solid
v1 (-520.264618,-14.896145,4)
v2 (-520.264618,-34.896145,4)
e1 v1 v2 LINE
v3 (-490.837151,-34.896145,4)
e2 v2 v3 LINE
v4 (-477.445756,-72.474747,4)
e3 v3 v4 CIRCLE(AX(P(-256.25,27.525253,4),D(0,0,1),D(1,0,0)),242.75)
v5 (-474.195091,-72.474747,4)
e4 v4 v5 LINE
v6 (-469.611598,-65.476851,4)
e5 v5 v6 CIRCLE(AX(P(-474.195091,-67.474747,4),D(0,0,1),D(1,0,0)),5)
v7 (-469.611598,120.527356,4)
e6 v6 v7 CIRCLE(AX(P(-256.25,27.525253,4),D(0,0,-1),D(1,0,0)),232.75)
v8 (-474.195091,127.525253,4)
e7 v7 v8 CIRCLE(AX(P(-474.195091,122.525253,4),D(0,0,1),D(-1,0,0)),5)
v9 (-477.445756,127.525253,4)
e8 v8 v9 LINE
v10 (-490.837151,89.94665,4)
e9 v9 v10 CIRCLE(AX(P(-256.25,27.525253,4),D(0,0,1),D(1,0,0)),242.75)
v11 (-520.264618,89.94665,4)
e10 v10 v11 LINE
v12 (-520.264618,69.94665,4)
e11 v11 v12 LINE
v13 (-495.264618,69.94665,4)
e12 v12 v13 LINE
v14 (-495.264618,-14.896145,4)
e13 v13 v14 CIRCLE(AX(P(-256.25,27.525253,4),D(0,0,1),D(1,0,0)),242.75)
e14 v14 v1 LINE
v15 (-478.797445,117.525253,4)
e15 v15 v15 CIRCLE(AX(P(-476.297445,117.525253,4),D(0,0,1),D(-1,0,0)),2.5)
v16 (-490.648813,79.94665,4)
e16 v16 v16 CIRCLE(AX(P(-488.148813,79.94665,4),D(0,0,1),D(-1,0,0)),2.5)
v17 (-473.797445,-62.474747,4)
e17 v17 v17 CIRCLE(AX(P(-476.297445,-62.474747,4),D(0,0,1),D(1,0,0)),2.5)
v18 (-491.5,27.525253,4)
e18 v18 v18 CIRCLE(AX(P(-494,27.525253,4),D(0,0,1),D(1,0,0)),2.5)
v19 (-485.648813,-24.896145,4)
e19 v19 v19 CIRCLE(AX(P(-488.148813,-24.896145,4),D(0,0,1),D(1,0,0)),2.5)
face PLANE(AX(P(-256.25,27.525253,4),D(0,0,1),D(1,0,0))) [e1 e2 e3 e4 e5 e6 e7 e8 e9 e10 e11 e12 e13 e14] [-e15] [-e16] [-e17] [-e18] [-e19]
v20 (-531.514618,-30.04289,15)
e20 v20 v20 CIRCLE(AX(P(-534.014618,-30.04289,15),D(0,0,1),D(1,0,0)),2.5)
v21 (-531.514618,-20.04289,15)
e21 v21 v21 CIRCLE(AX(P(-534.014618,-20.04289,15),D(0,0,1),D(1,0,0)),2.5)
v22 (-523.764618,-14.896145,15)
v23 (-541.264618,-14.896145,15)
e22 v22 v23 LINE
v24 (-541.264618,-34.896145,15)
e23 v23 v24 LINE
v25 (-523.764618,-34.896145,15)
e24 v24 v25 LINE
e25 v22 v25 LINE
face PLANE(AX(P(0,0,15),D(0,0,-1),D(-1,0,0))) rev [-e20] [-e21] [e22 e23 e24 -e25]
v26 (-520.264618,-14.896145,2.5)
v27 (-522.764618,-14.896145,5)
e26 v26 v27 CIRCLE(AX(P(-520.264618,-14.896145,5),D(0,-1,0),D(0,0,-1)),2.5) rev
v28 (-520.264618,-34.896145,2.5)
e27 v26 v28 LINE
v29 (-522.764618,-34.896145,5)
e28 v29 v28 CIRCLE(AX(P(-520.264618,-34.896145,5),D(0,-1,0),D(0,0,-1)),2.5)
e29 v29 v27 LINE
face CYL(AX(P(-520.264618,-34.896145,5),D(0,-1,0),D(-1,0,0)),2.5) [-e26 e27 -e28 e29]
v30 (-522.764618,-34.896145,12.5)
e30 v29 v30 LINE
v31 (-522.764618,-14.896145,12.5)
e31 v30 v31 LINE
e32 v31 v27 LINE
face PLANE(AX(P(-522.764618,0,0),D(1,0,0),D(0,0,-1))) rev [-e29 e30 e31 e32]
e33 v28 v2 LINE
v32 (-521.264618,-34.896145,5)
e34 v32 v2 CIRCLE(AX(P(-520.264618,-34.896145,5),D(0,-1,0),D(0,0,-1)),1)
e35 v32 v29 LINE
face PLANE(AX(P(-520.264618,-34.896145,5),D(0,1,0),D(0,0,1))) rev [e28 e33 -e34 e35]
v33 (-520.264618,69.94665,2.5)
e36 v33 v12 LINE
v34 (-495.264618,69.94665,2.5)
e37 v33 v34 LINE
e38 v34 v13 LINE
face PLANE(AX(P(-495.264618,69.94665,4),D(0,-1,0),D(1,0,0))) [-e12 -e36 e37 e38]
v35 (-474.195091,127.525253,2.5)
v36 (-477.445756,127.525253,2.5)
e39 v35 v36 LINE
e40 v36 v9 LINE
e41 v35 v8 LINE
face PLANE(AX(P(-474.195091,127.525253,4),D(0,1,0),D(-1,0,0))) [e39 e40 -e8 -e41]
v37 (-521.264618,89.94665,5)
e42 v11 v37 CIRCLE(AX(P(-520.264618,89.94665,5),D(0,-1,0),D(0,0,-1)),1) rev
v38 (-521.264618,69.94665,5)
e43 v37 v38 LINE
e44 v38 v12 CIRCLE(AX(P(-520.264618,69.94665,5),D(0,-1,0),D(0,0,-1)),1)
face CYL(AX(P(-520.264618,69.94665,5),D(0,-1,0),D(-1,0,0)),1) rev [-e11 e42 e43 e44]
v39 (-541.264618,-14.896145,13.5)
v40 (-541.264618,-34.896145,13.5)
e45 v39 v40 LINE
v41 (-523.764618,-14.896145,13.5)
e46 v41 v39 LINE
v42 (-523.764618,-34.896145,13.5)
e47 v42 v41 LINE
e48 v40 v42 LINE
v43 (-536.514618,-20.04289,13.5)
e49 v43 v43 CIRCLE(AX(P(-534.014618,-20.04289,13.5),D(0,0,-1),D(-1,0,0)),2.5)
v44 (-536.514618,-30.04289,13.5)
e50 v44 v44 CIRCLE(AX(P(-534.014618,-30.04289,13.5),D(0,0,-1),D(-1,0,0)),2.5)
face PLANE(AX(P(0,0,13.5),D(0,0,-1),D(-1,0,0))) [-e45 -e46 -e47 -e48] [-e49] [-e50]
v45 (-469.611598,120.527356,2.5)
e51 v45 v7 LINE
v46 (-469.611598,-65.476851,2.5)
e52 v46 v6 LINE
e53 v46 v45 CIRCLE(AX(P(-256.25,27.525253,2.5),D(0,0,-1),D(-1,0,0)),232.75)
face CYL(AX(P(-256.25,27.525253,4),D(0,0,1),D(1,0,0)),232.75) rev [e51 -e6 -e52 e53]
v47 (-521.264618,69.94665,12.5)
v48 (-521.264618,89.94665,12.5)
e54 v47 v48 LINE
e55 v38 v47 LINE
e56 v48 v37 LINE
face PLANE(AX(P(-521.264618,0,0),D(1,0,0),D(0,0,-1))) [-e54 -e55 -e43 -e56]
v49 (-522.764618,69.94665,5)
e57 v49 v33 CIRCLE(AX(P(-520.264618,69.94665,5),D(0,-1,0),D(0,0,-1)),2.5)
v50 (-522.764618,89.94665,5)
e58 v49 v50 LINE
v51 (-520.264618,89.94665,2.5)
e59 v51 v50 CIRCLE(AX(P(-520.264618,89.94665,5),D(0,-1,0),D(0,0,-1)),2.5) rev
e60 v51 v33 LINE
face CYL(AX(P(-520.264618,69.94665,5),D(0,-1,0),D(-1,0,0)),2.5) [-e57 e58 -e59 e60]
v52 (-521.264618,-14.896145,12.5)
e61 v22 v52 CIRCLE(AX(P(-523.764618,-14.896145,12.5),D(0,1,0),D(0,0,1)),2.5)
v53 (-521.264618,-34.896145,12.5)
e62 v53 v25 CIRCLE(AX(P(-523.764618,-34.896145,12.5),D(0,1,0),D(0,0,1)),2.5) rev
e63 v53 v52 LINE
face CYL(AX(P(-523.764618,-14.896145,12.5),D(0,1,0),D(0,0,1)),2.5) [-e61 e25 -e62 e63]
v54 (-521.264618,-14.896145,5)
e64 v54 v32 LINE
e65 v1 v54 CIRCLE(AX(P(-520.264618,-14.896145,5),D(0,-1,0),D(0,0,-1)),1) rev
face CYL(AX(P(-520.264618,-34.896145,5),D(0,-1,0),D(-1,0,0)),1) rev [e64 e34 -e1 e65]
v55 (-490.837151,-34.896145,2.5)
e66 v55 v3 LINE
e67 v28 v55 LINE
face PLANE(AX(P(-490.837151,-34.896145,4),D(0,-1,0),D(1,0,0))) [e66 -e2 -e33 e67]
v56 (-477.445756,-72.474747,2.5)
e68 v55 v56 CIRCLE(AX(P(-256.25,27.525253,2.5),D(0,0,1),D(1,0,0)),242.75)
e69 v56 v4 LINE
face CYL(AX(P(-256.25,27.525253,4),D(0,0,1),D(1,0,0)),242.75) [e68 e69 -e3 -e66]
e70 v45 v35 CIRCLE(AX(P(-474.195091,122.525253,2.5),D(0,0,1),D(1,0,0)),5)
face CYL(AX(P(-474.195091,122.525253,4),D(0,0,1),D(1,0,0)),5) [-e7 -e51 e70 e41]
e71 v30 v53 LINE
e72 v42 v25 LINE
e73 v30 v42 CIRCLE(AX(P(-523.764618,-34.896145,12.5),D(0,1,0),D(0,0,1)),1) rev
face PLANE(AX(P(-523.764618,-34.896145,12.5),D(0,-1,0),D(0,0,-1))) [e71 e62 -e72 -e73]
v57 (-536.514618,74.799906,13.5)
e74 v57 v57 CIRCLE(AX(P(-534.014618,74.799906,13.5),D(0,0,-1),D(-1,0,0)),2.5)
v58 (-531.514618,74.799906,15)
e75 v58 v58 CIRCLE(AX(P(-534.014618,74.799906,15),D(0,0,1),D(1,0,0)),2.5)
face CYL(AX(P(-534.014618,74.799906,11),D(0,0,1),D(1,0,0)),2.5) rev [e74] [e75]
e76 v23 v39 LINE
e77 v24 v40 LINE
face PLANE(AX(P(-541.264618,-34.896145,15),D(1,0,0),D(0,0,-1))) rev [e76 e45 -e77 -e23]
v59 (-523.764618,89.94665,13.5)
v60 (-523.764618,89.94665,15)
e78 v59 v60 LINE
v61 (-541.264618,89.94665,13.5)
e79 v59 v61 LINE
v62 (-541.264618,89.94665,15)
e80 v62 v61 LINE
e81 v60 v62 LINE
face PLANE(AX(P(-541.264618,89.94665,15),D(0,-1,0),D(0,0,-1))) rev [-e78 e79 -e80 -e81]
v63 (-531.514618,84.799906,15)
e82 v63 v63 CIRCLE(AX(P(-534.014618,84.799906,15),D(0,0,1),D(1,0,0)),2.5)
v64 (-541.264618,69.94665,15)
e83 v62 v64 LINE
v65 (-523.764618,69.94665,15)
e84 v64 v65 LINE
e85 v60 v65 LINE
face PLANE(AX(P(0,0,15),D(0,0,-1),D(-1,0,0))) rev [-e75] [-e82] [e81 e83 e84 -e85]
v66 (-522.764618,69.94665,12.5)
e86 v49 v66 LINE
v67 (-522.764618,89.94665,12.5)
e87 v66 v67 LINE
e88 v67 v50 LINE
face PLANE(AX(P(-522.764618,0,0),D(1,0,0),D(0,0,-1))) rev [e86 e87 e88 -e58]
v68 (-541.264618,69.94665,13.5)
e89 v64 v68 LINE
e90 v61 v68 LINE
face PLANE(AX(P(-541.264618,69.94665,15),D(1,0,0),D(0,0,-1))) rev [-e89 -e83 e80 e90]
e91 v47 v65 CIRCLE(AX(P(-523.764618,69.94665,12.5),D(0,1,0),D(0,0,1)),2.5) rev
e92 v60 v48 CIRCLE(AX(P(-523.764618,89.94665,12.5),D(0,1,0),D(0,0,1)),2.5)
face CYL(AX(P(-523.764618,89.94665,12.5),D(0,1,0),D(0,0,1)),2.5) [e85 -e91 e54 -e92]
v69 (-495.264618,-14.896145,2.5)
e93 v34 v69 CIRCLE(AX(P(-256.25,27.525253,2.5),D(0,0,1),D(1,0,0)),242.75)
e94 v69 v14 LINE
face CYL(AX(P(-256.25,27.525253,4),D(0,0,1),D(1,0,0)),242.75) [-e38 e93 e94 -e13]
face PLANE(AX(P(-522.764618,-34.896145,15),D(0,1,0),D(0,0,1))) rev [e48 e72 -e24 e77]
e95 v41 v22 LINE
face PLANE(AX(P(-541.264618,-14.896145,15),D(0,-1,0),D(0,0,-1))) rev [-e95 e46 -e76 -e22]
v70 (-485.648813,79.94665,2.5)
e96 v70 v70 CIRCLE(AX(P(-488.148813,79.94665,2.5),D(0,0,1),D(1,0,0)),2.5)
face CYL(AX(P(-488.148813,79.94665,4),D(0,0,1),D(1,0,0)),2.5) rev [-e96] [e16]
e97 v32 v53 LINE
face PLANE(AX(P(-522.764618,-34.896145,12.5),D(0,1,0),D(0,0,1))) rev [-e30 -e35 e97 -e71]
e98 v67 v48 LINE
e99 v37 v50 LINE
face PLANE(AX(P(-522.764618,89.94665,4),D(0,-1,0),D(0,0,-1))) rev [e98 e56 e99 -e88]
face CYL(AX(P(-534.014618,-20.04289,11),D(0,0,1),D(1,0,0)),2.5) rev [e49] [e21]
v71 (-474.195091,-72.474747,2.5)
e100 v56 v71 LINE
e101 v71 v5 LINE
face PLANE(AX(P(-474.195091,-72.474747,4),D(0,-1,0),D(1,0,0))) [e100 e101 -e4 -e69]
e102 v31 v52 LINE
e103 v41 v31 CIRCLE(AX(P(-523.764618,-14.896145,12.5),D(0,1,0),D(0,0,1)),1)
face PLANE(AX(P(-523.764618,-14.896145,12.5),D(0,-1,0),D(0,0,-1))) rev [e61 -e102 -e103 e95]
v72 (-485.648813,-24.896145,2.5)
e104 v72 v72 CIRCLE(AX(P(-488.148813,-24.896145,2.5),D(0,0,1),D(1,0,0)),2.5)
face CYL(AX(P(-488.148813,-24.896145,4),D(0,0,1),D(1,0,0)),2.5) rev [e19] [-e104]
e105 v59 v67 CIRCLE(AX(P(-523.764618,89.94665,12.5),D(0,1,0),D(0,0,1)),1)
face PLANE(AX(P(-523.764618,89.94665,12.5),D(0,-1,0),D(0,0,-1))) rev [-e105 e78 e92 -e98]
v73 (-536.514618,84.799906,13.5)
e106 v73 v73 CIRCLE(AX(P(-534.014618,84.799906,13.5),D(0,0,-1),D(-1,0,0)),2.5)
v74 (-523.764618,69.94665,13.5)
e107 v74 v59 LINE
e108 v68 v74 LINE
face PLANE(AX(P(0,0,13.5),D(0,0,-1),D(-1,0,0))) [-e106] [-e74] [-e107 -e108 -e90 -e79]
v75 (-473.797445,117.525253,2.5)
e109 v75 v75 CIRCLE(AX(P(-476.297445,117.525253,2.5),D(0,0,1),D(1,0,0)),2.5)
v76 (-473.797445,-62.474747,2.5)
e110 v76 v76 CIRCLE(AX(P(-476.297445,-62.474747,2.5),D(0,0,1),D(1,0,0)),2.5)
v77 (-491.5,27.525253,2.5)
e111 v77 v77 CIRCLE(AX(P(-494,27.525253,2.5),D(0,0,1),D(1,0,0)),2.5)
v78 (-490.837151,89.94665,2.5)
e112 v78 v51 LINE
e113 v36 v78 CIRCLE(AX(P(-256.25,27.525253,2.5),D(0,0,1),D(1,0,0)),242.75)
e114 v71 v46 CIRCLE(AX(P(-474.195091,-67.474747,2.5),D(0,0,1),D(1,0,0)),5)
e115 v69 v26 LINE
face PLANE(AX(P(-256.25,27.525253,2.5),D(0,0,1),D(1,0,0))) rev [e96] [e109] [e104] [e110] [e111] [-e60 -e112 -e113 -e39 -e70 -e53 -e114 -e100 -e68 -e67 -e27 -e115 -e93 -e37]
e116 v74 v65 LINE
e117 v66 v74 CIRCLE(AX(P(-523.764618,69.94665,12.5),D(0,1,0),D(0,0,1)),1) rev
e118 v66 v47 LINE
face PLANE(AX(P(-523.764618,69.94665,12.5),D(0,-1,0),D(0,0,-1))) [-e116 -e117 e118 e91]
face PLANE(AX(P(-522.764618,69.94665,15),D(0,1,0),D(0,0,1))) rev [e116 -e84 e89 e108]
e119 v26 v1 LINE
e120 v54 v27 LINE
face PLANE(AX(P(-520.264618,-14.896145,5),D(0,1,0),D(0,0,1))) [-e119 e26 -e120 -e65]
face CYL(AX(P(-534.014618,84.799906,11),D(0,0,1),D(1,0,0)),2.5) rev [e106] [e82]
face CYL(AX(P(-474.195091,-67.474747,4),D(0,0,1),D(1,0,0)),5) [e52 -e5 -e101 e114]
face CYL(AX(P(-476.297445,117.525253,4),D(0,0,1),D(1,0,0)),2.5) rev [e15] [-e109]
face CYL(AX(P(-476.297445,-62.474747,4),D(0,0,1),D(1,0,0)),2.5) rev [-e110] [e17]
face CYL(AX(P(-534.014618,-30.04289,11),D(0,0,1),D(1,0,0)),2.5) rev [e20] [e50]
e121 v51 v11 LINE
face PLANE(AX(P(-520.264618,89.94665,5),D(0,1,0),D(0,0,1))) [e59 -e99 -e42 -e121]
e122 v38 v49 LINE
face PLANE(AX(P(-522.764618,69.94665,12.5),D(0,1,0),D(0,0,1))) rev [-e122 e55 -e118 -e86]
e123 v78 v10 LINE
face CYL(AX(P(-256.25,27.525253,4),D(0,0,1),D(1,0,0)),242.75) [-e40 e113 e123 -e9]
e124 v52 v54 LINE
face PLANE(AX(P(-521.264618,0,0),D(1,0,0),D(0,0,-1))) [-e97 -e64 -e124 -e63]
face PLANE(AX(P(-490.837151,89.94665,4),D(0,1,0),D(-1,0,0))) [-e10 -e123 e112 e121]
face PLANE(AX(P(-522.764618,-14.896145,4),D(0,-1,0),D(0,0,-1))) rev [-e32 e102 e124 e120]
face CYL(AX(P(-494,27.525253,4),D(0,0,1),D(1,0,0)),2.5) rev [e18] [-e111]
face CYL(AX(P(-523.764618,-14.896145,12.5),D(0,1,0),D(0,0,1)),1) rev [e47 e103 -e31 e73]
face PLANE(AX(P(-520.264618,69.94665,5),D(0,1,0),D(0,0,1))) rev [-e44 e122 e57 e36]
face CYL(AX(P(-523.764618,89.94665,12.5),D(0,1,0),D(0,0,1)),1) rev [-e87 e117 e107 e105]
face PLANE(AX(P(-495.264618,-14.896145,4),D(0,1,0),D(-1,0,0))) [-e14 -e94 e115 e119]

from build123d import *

# Parameters (mm, degrees)
SKETCH1_R                = 2.5
BOSS_EXTRUDE1_DEPTH      = 4
CONVERT_SOLID1_OUTLINE_R = 2.5
CONVERT_SOLID1_DEPTH     = 2.5
EDGE_FLANGE1_DEPTH       = 20
EDGE_FLANGE1_BEND_DEPTH  = 20
EDGE_FLANGE2_DEPTH       = 20
EDGE_FLANGE2_BEND_DEPTH  = 20
SKETCH14_R               = 2.5
CUT_EXTRUDE1_DEPTH       = 4


# Read off the part's stored shape, not the designer's step: Convert-Solid1
# Sheet-metal steps are written as plain solids
with BuildPart() as part:
    # Sketch1 → Boss-Extrude1 (new body)
    with BuildSketch(Plane.XY):
        with BuildLine():
            Line((-474.195090562, 127.525252525), (-477.445756062, 127.525252525))
            ThreePointArc((-477.445756062, 127.525252525), (-484.91471638, 109.01150893), (-490.83715139, 89.946650322))
            Line((-490.83715139, 89.946650322), (-520.264617773, 89.946650322))
            Line((-520.264617773, 89.946650322), (-520.264617773, 69.946650322))
            Line((-520.264617773, 69.946650322), (-495.264617773, 69.946650322))
            ThreePointArc((-495.264617773, 69.946650322), (-499, 27.525252525), (-495.264617773, -14.896145272))
            Line((-495.264617773, -14.896145272), (-520.264617773, -14.896145272))
            Line((-520.264617773, -14.896145272), (-520.264617773, -34.896145272))
            Line((-520.264617773, -34.896145272), (-490.83715139, -34.896145272))
            ThreePointArc((-490.83715139, -34.896145272), (-484.91471638, -53.961003879), (-477.445756062, -72.474747475))
            Line((-477.445756062, -72.474747475), (-474.195090562, -72.474747475))
            ThreePointArc((-474.195090562, -72.474747475), (-470.012418883, -70.21432), (-469.611597595, -65.476850524))
            ThreePointArc((-469.611597595, -65.476850524), (-489, 27.525252525), (-469.611597595, 120.527355575))
            ThreePointArc((-469.611597595, 120.527355575), (-470.012418883, 125.264825051), (-474.195090562, 127.525252525))
        make_face()
        with Locations(Location((-488.148813177, 79.946650322, 0), (0, 0, 180))):
            Circle(SKETCH1_R, mode=Mode.SUBTRACT)
        with Locations((-494, 27.525252525)):
            Circle(SKETCH1_R, mode=Mode.SUBTRACT)
        with Locations((-488.148813177, -24.896145272)):
            Circle(SKETCH1_R, mode=Mode.SUBTRACT)
        with Locations((-476.297445473, -62.474747475)):
            Circle(SKETCH1_R, mode=Mode.SUBTRACT)
        with Locations(Location((-476.297445473, 117.525252525, 0), (0, 0, 180))):
            Circle(SKETCH1_R, mode=Mode.SUBTRACT)
    extrude(amount=BOSS_EXTRUDE1_DEPTH)

    # Convert-Solid1 outline → Convert-Solid1 (cut)
    with BuildSketch(Plane.XY):
        with BuildLine():
            ThreePointArc((-490.83715139, -34.896145272), (-484.91471638, -53.961003879), (-477.445756062, -72.474747475))
            Line((-477.445756062, -72.474747475), (-474.195090562, -72.474747475))
            ThreePointArc((-474.195090562, -72.474747475), (-470.012418883, -70.21432), (-469.611597595, -65.476850524))
            ThreePointArc((-469.611597595, -65.476850524), (-489, 27.525252525), (-469.611597595, 120.527355575))
            ThreePointArc((-469.611597595, 120.527355575), (-470.012418883, 125.264825051), (-474.195090562, 127.525252525))
            Line((-474.195090562, 127.525252525), (-477.445756062, 127.525252525))
            ThreePointArc((-477.445756062, 127.525252525), (-484.91471638, 109.011508929), (-490.83715139, 89.946650322))
            Line((-490.83715139, 89.946650322), (-520.264617773, 89.946650322))
            Line((-520.264617773, 89.946650322), (-520.264617773, 69.946650322))
            Line((-520.264617773, 69.946650322), (-495.264617773, 69.946650322))
            ThreePointArc((-495.264617773, 69.946650322), (-499, 27.525252525), (-495.264617773, -14.896145272))
            Line((-495.264617773, -14.896145272), (-520.264617773, -14.896145272))
            Line((-520.264617773, -14.896145272), (-520.264617773, -34.896145272))
            Line((-520.264617773, -34.896145272), (-490.83715139, -34.896145272))
        make_face()
        with Locations((-488.148813177, -24.896145272)):
            Circle(CONVERT_SOLID1_OUTLINE_R, mode=Mode.SUBTRACT)
        with Locations((-476.297445473, -62.474747475)):
            Circle(CONVERT_SOLID1_OUTLINE_R, mode=Mode.SUBTRACT)
        with Locations((-494, 27.525252525)):
            Circle(CONVERT_SOLID1_OUTLINE_R, mode=Mode.SUBTRACT)
        with Locations((-488.148813177, 79.946650322)):
            Circle(CONVERT_SOLID1_OUTLINE_R, mode=Mode.SUBTRACT)
        with Locations((-476.297445473, 117.525252525)):
            Circle(CONVERT_SOLID1_OUTLINE_R, mode=Mode.SUBTRACT)
    extrude(amount=CONVERT_SOLID1_DEPTH, mode=Mode.SUBTRACT)

    # Edge-Flange1 section (across the edge) → Edge-Flange1 (add)
    with BuildSketch(Plane(origin=(-521.264617773, 89.946650322, 4), x_dir=(1, 0, 0), z_dir=(0, -1, 0))):
        with BuildLine():
            Line((-1.5, 1), (-1.5, 8.5))
            Line((-1.5, 8.5), (0, 8.5))
            Line((0, 8.5), (0, 1))
            ThreePointArc((0, 1), (0.292893219, 0.292893219), (1, 0))
            Line((1, 0), (1, -1.5))
            ThreePointArc((1, -1.5), (-0.767766953, -0.767766953), (-1.5, 1))
        make_face()
    extrude(amount=EDGE_FLANGE1_DEPTH)

    # Edge-Flange1 section 2 (across the edge) → Edge-Flange1 bend (add)
    with BuildSketch(Plane(origin=(-521.264617773, -14.896145272, 4), x_dir=(1, 0, 0), z_dir=(0, -1, 0))):
        with BuildLine():
            Line((-1.5, 1), (-1.5, 8.5))
            Line((-1.5, 8.5), (0, 8.5))
            Line((0, 8.5), (0, 1))
            ThreePointArc((0, 1), (0.292893219, 0.292893219), (1, 0))
            Line((1, 0), (1, -1.5))
            ThreePointArc((1, -1.5), (-0.767766953, -0.767766953), (-1.5, 1))
        make_face()
    extrude(amount=EDGE_FLANGE1_BEND_DEPTH)

    # Edge-Flange2 section (across the edge) → Edge-Flange2 (add)
    with BuildSketch(Plane(origin=(-522.764617773, 69.946650322, 13.5), x_dir=(0, 0, -1), z_dir=(0, 1, 0))):
        with BuildLine():
            Line((-1.5, 1), (-1.5, 18.5))
            Line((-1.5, 18.5), (0, 18.5))
            Line((0, 18.5), (0, 1))
            ThreePointArc((0, 1), (0.292893219, 0.292893219), (1, 0))
            Line((1, 0), (1, -1.5))
            ThreePointArc((1, -1.5), (-0.767766953, -0.767766953), (-1.5, 1))
        make_face()
    extrude(amount=EDGE_FLANGE2_DEPTH)

    # Edge-Flange2 section 2 (across the edge) → Edge-Flange2 bend (add)
    with BuildSketch(Plane(origin=(-522.764617773, -34.896145272, 13.5), x_dir=(0, 0, -1), z_dir=(0, 1, 0))):
        with BuildLine():
            Line((-1.5, 1), (-1.5, 18.5))
            Line((-1.5, 18.5), (0, 18.5))
            Line((0, 18.5), (0, 1))
            ThreePointArc((0, 1), (0.292893219, 0.292893219), (1, 0))
            Line((1, 0), (1, -1.5))
            ThreePointArc((1, -1.5), (-0.767766953, -0.767766953), (-1.5, 1))
        make_face()
    extrude(amount=EDGE_FLANGE2_BEND_DEPTH)

    # Sketch14 → Cut-Extrude1 (cut)
    with BuildSketch(Plane.XY.offset(15)):
        with Locations((-534.014617773, 74.799905576)):
            Circle(SKETCH14_R)
        with Locations((-534.014617773, -20.042890014)):
            Circle(SKETCH14_R)
        with Locations((-534.014617773, -30.042890014)):
            Circle(SKETCH14_R)
        with Locations((-534.014617773, 84.799905576)):
            Circle(SKETCH14_R)
    extrude(amount=-CUT_EXTRUDE1_DEPTH, mode=Mode.SUBTRACT)


solid = part.part
